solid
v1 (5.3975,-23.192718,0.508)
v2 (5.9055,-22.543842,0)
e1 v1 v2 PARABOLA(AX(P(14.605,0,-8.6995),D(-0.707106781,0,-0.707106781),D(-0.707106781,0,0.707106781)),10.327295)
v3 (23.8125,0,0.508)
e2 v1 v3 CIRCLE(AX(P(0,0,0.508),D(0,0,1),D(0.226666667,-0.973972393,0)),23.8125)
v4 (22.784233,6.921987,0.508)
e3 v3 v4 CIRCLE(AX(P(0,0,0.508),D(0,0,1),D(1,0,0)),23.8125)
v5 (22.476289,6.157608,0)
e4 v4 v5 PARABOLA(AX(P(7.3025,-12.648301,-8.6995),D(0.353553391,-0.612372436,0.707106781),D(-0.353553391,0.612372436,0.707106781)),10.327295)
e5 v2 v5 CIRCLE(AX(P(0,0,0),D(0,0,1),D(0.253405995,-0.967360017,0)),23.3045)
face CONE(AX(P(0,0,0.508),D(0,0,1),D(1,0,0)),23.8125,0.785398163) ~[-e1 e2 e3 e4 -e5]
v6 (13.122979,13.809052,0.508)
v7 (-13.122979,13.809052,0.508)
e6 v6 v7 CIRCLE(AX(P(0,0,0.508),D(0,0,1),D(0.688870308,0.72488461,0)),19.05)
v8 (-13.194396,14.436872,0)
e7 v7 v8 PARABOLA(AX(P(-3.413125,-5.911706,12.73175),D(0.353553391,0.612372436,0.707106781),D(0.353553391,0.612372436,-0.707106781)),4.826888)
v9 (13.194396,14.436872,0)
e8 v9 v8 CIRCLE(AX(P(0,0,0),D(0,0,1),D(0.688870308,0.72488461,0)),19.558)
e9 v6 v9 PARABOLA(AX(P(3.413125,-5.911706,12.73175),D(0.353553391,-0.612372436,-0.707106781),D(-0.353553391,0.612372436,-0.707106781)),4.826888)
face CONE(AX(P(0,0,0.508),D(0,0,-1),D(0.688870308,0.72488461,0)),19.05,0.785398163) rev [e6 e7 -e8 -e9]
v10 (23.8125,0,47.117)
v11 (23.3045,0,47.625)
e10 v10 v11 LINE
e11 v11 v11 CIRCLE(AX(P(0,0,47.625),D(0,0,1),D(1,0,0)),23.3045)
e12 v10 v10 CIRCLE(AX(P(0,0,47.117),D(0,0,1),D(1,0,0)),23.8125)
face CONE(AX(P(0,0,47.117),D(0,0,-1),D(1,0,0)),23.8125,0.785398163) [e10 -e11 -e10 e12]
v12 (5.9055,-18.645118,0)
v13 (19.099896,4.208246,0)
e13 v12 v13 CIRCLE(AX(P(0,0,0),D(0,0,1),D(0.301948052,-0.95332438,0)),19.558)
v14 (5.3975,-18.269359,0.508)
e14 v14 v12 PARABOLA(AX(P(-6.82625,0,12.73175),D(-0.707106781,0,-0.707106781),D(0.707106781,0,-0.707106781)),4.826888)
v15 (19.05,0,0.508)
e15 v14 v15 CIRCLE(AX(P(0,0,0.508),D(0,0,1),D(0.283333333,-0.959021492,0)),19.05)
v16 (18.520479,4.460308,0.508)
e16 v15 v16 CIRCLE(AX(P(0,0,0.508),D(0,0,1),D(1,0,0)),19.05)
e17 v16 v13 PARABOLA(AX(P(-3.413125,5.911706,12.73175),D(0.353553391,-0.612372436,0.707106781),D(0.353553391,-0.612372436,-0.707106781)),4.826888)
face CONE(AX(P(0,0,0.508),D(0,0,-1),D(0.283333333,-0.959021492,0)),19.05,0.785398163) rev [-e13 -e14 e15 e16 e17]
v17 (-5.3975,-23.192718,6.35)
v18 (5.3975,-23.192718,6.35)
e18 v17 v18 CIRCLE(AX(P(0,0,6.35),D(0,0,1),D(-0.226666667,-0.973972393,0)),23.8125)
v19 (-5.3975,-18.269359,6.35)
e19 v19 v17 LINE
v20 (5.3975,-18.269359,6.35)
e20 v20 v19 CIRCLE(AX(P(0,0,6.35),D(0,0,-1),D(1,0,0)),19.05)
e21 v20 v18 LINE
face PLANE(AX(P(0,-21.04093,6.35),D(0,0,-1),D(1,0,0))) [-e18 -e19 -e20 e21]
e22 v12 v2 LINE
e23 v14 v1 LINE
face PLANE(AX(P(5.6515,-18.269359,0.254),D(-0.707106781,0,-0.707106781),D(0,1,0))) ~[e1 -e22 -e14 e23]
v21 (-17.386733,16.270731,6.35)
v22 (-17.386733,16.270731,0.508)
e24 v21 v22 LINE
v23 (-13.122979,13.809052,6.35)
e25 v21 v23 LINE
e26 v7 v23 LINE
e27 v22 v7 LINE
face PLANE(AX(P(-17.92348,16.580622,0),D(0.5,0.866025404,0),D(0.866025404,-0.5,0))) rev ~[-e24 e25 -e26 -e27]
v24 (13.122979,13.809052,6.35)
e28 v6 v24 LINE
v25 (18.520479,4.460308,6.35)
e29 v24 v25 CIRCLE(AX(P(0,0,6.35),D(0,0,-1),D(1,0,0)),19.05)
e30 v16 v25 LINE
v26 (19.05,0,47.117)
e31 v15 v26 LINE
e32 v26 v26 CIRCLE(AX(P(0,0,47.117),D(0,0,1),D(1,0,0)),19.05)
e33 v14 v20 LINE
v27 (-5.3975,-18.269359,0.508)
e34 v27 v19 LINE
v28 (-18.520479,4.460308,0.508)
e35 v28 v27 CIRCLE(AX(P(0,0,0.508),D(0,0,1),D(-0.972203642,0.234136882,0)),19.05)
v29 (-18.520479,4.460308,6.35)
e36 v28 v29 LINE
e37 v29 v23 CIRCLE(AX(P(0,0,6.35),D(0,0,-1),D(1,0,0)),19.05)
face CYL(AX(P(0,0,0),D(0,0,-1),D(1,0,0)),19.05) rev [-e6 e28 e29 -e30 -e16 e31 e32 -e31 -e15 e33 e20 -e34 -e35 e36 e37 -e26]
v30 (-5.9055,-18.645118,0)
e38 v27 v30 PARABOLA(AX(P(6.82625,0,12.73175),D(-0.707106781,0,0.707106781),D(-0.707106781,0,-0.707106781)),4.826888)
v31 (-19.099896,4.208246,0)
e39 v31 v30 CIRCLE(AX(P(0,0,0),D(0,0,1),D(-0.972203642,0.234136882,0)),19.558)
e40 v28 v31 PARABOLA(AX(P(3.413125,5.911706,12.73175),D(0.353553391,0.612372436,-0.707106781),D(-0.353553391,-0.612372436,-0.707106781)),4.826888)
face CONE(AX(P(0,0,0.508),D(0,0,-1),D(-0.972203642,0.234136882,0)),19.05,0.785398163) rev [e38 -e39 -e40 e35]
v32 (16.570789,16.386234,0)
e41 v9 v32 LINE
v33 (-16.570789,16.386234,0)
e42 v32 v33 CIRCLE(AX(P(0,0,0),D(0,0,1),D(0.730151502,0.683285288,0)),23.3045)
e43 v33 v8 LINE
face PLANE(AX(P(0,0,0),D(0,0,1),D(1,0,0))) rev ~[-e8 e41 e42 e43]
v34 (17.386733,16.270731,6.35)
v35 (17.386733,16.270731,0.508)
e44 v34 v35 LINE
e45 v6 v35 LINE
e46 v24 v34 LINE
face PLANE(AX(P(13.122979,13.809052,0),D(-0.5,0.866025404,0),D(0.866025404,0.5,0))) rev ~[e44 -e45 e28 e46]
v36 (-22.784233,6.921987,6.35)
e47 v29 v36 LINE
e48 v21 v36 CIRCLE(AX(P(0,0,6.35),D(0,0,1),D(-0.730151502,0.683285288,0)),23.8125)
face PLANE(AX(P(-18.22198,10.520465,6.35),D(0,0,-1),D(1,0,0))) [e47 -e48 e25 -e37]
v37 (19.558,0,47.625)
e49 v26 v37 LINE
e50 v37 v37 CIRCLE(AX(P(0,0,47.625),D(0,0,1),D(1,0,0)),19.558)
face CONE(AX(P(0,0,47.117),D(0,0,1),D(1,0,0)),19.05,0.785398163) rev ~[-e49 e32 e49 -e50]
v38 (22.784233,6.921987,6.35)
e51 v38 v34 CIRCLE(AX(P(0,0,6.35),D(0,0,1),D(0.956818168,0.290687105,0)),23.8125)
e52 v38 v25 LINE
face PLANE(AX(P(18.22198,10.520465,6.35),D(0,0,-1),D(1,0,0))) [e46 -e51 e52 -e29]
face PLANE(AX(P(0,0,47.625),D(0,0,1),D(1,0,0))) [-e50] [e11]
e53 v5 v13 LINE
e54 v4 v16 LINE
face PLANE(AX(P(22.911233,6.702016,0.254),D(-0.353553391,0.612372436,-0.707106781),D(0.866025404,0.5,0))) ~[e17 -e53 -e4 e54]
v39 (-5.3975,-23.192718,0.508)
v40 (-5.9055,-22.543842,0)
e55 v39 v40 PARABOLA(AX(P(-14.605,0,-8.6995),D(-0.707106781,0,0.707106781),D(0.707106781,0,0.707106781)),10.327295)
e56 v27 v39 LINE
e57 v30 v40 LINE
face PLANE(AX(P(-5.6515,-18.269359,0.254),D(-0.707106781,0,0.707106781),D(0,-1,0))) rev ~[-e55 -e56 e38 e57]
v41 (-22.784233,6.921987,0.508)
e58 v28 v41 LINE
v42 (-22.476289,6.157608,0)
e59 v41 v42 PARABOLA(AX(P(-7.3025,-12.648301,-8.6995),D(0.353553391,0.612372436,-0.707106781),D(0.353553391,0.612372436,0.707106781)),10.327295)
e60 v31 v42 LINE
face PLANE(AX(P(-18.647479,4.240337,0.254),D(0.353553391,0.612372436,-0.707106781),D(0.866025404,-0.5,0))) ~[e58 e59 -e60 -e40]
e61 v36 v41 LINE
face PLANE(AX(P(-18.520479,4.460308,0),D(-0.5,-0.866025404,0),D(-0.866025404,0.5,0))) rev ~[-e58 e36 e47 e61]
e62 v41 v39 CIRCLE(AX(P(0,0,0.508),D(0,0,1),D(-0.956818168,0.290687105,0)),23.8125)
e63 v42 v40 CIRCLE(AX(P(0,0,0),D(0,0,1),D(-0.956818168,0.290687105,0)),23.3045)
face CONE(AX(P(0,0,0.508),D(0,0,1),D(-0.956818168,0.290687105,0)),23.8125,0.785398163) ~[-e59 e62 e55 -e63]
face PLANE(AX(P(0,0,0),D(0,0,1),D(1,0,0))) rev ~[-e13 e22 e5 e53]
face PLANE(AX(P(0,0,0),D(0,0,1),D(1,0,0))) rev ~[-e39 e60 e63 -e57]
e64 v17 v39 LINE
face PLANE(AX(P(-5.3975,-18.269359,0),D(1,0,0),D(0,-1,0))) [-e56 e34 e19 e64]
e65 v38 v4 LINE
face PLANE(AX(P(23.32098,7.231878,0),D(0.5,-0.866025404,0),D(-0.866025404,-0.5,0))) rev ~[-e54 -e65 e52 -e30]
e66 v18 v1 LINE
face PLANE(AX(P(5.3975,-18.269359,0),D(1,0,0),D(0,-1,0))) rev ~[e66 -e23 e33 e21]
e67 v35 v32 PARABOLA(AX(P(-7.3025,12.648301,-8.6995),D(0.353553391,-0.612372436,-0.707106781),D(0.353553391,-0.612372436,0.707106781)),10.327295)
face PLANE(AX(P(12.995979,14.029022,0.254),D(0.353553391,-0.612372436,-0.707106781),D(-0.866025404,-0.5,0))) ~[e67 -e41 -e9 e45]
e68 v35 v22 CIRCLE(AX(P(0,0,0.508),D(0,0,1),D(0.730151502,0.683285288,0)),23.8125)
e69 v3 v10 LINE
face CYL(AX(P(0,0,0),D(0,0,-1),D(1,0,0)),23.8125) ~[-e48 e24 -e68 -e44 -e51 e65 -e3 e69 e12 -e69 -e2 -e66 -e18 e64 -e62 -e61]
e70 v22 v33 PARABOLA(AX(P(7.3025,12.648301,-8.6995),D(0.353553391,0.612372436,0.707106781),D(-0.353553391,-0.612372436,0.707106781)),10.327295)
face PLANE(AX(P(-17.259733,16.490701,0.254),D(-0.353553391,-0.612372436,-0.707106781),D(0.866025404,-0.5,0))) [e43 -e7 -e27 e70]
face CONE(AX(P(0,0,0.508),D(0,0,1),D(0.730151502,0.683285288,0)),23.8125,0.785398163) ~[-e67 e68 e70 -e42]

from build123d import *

# Parameters (mm, degrees)
F0_R     = 23.8125
F0_R_2   = 19.05
F1_DEPTH = 47.625
F2_W     = 10.795
F2_H     = 5.5431405764
F3_DEPTH = 6.35
F4_SIZE  = 0.508


with BuildPart() as f1:
    # F0 (on Top) → F1 (new body)
    with BuildSketch(Plane.XY):
        Circle(F0_R)
        Circle(F0_R_2, mode=Mode.SUBTRACT)
    extrude(amount=F1_DEPTH)

    # F2 (on face) → F3 (cut)
    with BuildSketch(Plane(origin=(0, 0, 0), x_dir=(1, 0, 0), z_dir=(0, 0, -1))):
        with Locations((0, 21.0409297118)):
            Rectangle(F2_W, F2_H)
        Polygon((-23.3209799276, -7.2318778831), (-17.9234799276, -16.5806221169), (-13.1229793717, -13.8090518287), (-18.5204793717, -4.4603075949), align=None)
        Polygon((17.9234799276, -16.5806221169), (23.3209799276, -7.2318778831), (18.5204793717, -4.4603075949), (13.1229793717, -13.8090518287), align=None)
    extrude(amount=-F3_DEPTH, mode=Mode.SUBTRACT)

    # F4
    f4_edges = [f1.edges().sort_by_distance(p)[0] for p in [
        (-23.8125, 0, 47.625),
        (-19.05, 0, 47.625),
        (-16.497784, -9.525, 0),
        (-20.62223, -11.90625, 0),
        (18.648902, -14.807214, 0),
        (15.259831, -11.403511, 0),
        (0, 19.05, 0),
        (0, 23.8125, 0),
        (-20.652356, 5.691147, 0),
        (-5.3975, -20.731039, 0),
        (5.3975, -20.731039, 0),
        (20.652356, 5.691147, 0),
        (15.254856, 15.039891, 0),
        (-15.254856, 15.039891, 0),
    ]]
    chamfer(f4_edges, length=F4_SIZE)


solid = f1.part
